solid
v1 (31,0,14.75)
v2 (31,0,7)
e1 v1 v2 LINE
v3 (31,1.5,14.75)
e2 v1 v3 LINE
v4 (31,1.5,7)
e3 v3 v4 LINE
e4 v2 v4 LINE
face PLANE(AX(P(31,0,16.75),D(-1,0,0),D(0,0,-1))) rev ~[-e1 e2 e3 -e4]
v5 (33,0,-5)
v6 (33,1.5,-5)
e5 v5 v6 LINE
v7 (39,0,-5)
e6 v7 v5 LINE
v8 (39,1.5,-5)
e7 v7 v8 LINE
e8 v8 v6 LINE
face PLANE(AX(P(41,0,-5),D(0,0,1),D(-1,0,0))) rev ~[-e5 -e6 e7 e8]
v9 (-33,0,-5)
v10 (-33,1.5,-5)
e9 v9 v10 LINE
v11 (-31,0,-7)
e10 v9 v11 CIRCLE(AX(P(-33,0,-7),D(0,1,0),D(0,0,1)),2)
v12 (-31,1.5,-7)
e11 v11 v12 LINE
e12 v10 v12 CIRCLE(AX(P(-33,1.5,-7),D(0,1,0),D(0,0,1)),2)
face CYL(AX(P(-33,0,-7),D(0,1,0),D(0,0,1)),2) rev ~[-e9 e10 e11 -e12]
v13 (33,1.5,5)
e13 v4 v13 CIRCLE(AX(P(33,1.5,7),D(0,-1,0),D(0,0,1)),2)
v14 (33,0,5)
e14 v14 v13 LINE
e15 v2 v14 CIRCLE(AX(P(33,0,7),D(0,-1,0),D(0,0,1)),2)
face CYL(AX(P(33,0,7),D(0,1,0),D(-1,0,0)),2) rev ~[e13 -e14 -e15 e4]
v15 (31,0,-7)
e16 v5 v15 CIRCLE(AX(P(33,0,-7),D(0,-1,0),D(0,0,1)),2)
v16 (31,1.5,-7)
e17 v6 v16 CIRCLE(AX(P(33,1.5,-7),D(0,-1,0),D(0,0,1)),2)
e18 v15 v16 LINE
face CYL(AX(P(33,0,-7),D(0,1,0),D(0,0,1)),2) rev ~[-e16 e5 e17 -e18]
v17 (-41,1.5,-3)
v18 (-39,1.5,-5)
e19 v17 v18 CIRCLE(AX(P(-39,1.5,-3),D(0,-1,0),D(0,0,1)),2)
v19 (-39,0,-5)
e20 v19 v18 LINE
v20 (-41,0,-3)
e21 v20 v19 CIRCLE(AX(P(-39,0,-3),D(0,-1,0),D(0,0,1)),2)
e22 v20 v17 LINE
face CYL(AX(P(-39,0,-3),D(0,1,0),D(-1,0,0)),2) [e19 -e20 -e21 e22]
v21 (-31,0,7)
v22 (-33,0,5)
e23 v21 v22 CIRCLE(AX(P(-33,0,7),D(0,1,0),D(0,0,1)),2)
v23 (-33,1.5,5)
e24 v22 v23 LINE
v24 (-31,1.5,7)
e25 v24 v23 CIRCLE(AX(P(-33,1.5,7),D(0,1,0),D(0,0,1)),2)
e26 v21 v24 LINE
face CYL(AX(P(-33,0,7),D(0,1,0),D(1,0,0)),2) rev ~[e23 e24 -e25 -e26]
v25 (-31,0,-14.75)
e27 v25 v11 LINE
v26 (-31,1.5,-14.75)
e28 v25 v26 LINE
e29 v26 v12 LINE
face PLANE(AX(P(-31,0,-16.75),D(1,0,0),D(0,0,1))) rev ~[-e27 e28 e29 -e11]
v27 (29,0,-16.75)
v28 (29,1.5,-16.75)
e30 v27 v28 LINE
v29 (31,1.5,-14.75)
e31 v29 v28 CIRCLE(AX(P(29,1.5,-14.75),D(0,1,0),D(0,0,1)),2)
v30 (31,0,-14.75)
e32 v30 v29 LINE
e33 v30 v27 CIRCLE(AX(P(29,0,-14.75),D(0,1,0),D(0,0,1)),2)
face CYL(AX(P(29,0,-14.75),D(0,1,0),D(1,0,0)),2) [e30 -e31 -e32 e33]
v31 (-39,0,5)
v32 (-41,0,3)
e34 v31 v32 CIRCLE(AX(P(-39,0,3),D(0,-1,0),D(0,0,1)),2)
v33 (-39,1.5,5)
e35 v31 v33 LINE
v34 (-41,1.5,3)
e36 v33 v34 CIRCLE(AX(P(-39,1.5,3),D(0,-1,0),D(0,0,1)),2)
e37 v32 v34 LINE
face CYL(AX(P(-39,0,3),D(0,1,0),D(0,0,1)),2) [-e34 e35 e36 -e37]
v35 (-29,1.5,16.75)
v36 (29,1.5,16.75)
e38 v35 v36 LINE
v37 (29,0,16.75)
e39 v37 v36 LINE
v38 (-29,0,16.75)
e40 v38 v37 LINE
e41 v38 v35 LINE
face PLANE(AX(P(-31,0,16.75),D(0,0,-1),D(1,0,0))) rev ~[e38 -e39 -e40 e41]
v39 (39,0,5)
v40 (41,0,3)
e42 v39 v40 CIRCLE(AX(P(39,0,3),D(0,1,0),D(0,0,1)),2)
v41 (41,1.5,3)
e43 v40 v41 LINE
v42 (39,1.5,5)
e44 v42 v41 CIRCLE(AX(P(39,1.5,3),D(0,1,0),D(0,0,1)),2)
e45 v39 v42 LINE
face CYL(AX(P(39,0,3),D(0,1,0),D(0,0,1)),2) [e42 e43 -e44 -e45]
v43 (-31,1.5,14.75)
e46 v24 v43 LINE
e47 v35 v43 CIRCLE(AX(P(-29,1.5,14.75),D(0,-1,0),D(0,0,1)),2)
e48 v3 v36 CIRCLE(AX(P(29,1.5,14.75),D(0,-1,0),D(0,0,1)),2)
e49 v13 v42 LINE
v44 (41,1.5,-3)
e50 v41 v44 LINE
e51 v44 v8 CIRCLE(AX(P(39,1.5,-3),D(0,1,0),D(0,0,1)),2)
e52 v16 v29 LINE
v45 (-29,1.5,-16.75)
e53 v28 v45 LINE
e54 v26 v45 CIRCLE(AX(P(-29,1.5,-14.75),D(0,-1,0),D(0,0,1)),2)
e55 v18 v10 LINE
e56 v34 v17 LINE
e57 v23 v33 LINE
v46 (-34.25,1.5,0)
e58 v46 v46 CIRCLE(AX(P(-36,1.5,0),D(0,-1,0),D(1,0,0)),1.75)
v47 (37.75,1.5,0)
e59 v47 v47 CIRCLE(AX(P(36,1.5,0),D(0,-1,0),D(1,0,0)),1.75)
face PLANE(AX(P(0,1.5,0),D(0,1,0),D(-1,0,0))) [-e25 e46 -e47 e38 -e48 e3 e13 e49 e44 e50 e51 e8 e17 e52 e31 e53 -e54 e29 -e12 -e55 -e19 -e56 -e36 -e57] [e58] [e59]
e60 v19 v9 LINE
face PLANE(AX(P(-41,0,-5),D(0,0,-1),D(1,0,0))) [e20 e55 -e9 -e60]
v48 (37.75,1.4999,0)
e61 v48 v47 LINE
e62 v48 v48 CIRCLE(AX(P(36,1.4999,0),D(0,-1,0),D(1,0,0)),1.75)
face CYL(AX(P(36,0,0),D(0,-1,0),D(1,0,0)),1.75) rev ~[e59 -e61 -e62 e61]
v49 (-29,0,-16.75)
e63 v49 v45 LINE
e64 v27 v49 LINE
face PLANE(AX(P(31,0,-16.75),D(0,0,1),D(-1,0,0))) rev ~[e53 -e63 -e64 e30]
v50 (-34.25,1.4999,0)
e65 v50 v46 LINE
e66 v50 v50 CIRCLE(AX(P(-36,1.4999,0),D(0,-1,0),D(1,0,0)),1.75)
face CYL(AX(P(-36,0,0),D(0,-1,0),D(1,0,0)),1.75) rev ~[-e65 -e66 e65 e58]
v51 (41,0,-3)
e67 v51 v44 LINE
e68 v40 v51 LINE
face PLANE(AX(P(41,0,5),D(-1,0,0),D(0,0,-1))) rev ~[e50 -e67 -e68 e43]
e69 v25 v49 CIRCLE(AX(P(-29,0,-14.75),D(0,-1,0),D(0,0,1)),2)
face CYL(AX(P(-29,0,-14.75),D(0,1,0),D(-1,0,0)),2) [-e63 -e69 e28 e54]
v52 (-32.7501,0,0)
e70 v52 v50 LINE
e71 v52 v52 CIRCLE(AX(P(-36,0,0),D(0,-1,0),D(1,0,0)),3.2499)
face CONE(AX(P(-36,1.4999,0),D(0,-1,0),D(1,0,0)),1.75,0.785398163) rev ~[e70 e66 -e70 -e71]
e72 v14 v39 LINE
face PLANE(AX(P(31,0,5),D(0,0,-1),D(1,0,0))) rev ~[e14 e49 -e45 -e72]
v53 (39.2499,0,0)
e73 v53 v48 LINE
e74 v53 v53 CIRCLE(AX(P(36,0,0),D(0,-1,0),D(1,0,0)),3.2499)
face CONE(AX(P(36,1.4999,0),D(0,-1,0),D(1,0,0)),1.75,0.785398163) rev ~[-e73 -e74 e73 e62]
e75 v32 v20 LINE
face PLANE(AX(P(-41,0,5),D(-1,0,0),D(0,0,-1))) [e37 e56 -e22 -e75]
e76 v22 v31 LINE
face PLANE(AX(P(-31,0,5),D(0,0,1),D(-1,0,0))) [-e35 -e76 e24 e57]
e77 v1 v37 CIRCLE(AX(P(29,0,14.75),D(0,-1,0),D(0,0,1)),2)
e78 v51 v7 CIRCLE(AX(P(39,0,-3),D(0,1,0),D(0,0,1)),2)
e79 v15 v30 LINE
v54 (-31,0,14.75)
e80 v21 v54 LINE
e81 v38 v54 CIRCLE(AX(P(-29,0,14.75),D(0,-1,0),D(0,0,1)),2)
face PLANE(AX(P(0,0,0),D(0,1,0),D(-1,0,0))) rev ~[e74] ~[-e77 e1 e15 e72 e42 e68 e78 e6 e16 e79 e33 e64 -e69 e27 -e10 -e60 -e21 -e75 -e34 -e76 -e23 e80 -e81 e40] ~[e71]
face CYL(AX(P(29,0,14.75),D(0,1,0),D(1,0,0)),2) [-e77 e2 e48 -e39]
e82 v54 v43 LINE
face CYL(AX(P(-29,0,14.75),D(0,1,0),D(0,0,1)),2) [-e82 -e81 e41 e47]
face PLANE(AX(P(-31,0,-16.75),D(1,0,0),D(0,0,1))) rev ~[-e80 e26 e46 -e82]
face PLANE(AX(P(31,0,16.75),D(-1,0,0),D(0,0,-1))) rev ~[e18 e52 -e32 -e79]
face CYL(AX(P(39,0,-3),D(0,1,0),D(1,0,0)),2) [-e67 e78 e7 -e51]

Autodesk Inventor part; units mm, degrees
ref_plane "YZ Plane" through (0, 0, 0) normal (1, 0, 0) x (0, 1, 0)
ref_plane "XZ Plane" through (0, 0, 0) normal (0, 1, 0) x (-1, 0, 0)
ref_plane "XY Plane" through (0, 0, 0) normal (0, 0, 1) x (1, 0, 0)
sketch "Sketch1" plane through (0, 0, 0) normal (0, 1, 0) x (-1, 0, 0)
  line L0 (-31, -16.75) -> (31, -16.75)
  line L1 (31, -16.75) -> (31, 16.75)
  line L2 (31, 16.75) -> (-31, 16.75)
  line L3 (-31, 16.75) -> (-31, -16.75)
  line L4 (-31, -16.75) -> (31, 16.75) construction
  line L5 (31, -16.75) -> (-31, 16.75) construction
  point P0 (0, 0)
  dimension "d0" = 33.5
  dimension "d1" = 62
extrude "Extrusion1" add sketch "Sketch1" along normal blind 1.5
fillet "Fillet1" radius 2 4 edges at (31, 0.75, 16.75) (31, 0.75, -16.75) (-31, 0.75, -16.75) (-31, 0.75, 16.75)
sketch "Sketch5" plane through (0, 0, 0) normal (0, -1, 0) x (1, 0, 0)
  line L0 (41, -5) -> (31, -5)
  line L1 (31, -5) -> (31, 5)
  line L2 (31, 5) -> (41, 5)
  line L3 (41, 5) -> (41, -5)
  line L4 (41, -5) -> (31, 5) construction
  line L5 (31, -5) -> (41, 5) construction
  line L6 (31, 14.75) -> (31, -14.75) projected
  line L7 (-41, -5) -> (-31, -5)
  line L8 (-31, -5) -> (-31, 5)
  line L9 (-31, 5) -> (-41, 5)
  line L10 (-41, 5) -> (-41, -5)
  line L11 (-41, -5) -> (-31, 5) construction
  line L12 (-31, -5) -> (-41, 5) construction
  line L13 (-31, -14.75) -> (-31, 14.75) projected
  point P0 (0, 0)
  point P1 (36, 0)
  point P2 (36, 0)
  point P3 (-36, 0)
  point P4 (-36, 0)
  dimension "d37" = 10
  dimension "d38" = 10
extrude "Extrusion6" add sketch "Sketch5" against normal up to surface (1.5 mm away)
sketch "Sketch6" plane through (0, 0, 0) normal (0, -1, 0) x (1, 0, 0)
  circle A0 centre (36, 0) radius 1.75
  line L0 (31, 14.75) -> (31, 5) projected
  circle A1 centre (-36, 0) radius 1.75
  line L1 (-31, 5) -> (-31, 14.75) projected
  point P0 (0, 0)
  dimension "d41" = 3.5
  dimension "d42" = 5
  dimension "d51" = 5
extrude "Extrusion7" cut sketch "Sketch6" against normal up to surface (1.5 mm away)
fillet "Fillet6" radius 2 8 edges at (31, 0.75, 5) (41, 0.75, 5) (41, 0.75, -5) (31, 0.75, -5) (-31, 0.75, 5) (-41, 0.75, 5) (-41, 0.75, -5) (-31, 0.75, -5)
chamfer "Chamfer1" distance 1.5 angle 45 2 edges at (34.25, 0, 0) (-37.75, 0, 0)
equation "\"d51\" = d42"
properties part number "BatteryPlate"
